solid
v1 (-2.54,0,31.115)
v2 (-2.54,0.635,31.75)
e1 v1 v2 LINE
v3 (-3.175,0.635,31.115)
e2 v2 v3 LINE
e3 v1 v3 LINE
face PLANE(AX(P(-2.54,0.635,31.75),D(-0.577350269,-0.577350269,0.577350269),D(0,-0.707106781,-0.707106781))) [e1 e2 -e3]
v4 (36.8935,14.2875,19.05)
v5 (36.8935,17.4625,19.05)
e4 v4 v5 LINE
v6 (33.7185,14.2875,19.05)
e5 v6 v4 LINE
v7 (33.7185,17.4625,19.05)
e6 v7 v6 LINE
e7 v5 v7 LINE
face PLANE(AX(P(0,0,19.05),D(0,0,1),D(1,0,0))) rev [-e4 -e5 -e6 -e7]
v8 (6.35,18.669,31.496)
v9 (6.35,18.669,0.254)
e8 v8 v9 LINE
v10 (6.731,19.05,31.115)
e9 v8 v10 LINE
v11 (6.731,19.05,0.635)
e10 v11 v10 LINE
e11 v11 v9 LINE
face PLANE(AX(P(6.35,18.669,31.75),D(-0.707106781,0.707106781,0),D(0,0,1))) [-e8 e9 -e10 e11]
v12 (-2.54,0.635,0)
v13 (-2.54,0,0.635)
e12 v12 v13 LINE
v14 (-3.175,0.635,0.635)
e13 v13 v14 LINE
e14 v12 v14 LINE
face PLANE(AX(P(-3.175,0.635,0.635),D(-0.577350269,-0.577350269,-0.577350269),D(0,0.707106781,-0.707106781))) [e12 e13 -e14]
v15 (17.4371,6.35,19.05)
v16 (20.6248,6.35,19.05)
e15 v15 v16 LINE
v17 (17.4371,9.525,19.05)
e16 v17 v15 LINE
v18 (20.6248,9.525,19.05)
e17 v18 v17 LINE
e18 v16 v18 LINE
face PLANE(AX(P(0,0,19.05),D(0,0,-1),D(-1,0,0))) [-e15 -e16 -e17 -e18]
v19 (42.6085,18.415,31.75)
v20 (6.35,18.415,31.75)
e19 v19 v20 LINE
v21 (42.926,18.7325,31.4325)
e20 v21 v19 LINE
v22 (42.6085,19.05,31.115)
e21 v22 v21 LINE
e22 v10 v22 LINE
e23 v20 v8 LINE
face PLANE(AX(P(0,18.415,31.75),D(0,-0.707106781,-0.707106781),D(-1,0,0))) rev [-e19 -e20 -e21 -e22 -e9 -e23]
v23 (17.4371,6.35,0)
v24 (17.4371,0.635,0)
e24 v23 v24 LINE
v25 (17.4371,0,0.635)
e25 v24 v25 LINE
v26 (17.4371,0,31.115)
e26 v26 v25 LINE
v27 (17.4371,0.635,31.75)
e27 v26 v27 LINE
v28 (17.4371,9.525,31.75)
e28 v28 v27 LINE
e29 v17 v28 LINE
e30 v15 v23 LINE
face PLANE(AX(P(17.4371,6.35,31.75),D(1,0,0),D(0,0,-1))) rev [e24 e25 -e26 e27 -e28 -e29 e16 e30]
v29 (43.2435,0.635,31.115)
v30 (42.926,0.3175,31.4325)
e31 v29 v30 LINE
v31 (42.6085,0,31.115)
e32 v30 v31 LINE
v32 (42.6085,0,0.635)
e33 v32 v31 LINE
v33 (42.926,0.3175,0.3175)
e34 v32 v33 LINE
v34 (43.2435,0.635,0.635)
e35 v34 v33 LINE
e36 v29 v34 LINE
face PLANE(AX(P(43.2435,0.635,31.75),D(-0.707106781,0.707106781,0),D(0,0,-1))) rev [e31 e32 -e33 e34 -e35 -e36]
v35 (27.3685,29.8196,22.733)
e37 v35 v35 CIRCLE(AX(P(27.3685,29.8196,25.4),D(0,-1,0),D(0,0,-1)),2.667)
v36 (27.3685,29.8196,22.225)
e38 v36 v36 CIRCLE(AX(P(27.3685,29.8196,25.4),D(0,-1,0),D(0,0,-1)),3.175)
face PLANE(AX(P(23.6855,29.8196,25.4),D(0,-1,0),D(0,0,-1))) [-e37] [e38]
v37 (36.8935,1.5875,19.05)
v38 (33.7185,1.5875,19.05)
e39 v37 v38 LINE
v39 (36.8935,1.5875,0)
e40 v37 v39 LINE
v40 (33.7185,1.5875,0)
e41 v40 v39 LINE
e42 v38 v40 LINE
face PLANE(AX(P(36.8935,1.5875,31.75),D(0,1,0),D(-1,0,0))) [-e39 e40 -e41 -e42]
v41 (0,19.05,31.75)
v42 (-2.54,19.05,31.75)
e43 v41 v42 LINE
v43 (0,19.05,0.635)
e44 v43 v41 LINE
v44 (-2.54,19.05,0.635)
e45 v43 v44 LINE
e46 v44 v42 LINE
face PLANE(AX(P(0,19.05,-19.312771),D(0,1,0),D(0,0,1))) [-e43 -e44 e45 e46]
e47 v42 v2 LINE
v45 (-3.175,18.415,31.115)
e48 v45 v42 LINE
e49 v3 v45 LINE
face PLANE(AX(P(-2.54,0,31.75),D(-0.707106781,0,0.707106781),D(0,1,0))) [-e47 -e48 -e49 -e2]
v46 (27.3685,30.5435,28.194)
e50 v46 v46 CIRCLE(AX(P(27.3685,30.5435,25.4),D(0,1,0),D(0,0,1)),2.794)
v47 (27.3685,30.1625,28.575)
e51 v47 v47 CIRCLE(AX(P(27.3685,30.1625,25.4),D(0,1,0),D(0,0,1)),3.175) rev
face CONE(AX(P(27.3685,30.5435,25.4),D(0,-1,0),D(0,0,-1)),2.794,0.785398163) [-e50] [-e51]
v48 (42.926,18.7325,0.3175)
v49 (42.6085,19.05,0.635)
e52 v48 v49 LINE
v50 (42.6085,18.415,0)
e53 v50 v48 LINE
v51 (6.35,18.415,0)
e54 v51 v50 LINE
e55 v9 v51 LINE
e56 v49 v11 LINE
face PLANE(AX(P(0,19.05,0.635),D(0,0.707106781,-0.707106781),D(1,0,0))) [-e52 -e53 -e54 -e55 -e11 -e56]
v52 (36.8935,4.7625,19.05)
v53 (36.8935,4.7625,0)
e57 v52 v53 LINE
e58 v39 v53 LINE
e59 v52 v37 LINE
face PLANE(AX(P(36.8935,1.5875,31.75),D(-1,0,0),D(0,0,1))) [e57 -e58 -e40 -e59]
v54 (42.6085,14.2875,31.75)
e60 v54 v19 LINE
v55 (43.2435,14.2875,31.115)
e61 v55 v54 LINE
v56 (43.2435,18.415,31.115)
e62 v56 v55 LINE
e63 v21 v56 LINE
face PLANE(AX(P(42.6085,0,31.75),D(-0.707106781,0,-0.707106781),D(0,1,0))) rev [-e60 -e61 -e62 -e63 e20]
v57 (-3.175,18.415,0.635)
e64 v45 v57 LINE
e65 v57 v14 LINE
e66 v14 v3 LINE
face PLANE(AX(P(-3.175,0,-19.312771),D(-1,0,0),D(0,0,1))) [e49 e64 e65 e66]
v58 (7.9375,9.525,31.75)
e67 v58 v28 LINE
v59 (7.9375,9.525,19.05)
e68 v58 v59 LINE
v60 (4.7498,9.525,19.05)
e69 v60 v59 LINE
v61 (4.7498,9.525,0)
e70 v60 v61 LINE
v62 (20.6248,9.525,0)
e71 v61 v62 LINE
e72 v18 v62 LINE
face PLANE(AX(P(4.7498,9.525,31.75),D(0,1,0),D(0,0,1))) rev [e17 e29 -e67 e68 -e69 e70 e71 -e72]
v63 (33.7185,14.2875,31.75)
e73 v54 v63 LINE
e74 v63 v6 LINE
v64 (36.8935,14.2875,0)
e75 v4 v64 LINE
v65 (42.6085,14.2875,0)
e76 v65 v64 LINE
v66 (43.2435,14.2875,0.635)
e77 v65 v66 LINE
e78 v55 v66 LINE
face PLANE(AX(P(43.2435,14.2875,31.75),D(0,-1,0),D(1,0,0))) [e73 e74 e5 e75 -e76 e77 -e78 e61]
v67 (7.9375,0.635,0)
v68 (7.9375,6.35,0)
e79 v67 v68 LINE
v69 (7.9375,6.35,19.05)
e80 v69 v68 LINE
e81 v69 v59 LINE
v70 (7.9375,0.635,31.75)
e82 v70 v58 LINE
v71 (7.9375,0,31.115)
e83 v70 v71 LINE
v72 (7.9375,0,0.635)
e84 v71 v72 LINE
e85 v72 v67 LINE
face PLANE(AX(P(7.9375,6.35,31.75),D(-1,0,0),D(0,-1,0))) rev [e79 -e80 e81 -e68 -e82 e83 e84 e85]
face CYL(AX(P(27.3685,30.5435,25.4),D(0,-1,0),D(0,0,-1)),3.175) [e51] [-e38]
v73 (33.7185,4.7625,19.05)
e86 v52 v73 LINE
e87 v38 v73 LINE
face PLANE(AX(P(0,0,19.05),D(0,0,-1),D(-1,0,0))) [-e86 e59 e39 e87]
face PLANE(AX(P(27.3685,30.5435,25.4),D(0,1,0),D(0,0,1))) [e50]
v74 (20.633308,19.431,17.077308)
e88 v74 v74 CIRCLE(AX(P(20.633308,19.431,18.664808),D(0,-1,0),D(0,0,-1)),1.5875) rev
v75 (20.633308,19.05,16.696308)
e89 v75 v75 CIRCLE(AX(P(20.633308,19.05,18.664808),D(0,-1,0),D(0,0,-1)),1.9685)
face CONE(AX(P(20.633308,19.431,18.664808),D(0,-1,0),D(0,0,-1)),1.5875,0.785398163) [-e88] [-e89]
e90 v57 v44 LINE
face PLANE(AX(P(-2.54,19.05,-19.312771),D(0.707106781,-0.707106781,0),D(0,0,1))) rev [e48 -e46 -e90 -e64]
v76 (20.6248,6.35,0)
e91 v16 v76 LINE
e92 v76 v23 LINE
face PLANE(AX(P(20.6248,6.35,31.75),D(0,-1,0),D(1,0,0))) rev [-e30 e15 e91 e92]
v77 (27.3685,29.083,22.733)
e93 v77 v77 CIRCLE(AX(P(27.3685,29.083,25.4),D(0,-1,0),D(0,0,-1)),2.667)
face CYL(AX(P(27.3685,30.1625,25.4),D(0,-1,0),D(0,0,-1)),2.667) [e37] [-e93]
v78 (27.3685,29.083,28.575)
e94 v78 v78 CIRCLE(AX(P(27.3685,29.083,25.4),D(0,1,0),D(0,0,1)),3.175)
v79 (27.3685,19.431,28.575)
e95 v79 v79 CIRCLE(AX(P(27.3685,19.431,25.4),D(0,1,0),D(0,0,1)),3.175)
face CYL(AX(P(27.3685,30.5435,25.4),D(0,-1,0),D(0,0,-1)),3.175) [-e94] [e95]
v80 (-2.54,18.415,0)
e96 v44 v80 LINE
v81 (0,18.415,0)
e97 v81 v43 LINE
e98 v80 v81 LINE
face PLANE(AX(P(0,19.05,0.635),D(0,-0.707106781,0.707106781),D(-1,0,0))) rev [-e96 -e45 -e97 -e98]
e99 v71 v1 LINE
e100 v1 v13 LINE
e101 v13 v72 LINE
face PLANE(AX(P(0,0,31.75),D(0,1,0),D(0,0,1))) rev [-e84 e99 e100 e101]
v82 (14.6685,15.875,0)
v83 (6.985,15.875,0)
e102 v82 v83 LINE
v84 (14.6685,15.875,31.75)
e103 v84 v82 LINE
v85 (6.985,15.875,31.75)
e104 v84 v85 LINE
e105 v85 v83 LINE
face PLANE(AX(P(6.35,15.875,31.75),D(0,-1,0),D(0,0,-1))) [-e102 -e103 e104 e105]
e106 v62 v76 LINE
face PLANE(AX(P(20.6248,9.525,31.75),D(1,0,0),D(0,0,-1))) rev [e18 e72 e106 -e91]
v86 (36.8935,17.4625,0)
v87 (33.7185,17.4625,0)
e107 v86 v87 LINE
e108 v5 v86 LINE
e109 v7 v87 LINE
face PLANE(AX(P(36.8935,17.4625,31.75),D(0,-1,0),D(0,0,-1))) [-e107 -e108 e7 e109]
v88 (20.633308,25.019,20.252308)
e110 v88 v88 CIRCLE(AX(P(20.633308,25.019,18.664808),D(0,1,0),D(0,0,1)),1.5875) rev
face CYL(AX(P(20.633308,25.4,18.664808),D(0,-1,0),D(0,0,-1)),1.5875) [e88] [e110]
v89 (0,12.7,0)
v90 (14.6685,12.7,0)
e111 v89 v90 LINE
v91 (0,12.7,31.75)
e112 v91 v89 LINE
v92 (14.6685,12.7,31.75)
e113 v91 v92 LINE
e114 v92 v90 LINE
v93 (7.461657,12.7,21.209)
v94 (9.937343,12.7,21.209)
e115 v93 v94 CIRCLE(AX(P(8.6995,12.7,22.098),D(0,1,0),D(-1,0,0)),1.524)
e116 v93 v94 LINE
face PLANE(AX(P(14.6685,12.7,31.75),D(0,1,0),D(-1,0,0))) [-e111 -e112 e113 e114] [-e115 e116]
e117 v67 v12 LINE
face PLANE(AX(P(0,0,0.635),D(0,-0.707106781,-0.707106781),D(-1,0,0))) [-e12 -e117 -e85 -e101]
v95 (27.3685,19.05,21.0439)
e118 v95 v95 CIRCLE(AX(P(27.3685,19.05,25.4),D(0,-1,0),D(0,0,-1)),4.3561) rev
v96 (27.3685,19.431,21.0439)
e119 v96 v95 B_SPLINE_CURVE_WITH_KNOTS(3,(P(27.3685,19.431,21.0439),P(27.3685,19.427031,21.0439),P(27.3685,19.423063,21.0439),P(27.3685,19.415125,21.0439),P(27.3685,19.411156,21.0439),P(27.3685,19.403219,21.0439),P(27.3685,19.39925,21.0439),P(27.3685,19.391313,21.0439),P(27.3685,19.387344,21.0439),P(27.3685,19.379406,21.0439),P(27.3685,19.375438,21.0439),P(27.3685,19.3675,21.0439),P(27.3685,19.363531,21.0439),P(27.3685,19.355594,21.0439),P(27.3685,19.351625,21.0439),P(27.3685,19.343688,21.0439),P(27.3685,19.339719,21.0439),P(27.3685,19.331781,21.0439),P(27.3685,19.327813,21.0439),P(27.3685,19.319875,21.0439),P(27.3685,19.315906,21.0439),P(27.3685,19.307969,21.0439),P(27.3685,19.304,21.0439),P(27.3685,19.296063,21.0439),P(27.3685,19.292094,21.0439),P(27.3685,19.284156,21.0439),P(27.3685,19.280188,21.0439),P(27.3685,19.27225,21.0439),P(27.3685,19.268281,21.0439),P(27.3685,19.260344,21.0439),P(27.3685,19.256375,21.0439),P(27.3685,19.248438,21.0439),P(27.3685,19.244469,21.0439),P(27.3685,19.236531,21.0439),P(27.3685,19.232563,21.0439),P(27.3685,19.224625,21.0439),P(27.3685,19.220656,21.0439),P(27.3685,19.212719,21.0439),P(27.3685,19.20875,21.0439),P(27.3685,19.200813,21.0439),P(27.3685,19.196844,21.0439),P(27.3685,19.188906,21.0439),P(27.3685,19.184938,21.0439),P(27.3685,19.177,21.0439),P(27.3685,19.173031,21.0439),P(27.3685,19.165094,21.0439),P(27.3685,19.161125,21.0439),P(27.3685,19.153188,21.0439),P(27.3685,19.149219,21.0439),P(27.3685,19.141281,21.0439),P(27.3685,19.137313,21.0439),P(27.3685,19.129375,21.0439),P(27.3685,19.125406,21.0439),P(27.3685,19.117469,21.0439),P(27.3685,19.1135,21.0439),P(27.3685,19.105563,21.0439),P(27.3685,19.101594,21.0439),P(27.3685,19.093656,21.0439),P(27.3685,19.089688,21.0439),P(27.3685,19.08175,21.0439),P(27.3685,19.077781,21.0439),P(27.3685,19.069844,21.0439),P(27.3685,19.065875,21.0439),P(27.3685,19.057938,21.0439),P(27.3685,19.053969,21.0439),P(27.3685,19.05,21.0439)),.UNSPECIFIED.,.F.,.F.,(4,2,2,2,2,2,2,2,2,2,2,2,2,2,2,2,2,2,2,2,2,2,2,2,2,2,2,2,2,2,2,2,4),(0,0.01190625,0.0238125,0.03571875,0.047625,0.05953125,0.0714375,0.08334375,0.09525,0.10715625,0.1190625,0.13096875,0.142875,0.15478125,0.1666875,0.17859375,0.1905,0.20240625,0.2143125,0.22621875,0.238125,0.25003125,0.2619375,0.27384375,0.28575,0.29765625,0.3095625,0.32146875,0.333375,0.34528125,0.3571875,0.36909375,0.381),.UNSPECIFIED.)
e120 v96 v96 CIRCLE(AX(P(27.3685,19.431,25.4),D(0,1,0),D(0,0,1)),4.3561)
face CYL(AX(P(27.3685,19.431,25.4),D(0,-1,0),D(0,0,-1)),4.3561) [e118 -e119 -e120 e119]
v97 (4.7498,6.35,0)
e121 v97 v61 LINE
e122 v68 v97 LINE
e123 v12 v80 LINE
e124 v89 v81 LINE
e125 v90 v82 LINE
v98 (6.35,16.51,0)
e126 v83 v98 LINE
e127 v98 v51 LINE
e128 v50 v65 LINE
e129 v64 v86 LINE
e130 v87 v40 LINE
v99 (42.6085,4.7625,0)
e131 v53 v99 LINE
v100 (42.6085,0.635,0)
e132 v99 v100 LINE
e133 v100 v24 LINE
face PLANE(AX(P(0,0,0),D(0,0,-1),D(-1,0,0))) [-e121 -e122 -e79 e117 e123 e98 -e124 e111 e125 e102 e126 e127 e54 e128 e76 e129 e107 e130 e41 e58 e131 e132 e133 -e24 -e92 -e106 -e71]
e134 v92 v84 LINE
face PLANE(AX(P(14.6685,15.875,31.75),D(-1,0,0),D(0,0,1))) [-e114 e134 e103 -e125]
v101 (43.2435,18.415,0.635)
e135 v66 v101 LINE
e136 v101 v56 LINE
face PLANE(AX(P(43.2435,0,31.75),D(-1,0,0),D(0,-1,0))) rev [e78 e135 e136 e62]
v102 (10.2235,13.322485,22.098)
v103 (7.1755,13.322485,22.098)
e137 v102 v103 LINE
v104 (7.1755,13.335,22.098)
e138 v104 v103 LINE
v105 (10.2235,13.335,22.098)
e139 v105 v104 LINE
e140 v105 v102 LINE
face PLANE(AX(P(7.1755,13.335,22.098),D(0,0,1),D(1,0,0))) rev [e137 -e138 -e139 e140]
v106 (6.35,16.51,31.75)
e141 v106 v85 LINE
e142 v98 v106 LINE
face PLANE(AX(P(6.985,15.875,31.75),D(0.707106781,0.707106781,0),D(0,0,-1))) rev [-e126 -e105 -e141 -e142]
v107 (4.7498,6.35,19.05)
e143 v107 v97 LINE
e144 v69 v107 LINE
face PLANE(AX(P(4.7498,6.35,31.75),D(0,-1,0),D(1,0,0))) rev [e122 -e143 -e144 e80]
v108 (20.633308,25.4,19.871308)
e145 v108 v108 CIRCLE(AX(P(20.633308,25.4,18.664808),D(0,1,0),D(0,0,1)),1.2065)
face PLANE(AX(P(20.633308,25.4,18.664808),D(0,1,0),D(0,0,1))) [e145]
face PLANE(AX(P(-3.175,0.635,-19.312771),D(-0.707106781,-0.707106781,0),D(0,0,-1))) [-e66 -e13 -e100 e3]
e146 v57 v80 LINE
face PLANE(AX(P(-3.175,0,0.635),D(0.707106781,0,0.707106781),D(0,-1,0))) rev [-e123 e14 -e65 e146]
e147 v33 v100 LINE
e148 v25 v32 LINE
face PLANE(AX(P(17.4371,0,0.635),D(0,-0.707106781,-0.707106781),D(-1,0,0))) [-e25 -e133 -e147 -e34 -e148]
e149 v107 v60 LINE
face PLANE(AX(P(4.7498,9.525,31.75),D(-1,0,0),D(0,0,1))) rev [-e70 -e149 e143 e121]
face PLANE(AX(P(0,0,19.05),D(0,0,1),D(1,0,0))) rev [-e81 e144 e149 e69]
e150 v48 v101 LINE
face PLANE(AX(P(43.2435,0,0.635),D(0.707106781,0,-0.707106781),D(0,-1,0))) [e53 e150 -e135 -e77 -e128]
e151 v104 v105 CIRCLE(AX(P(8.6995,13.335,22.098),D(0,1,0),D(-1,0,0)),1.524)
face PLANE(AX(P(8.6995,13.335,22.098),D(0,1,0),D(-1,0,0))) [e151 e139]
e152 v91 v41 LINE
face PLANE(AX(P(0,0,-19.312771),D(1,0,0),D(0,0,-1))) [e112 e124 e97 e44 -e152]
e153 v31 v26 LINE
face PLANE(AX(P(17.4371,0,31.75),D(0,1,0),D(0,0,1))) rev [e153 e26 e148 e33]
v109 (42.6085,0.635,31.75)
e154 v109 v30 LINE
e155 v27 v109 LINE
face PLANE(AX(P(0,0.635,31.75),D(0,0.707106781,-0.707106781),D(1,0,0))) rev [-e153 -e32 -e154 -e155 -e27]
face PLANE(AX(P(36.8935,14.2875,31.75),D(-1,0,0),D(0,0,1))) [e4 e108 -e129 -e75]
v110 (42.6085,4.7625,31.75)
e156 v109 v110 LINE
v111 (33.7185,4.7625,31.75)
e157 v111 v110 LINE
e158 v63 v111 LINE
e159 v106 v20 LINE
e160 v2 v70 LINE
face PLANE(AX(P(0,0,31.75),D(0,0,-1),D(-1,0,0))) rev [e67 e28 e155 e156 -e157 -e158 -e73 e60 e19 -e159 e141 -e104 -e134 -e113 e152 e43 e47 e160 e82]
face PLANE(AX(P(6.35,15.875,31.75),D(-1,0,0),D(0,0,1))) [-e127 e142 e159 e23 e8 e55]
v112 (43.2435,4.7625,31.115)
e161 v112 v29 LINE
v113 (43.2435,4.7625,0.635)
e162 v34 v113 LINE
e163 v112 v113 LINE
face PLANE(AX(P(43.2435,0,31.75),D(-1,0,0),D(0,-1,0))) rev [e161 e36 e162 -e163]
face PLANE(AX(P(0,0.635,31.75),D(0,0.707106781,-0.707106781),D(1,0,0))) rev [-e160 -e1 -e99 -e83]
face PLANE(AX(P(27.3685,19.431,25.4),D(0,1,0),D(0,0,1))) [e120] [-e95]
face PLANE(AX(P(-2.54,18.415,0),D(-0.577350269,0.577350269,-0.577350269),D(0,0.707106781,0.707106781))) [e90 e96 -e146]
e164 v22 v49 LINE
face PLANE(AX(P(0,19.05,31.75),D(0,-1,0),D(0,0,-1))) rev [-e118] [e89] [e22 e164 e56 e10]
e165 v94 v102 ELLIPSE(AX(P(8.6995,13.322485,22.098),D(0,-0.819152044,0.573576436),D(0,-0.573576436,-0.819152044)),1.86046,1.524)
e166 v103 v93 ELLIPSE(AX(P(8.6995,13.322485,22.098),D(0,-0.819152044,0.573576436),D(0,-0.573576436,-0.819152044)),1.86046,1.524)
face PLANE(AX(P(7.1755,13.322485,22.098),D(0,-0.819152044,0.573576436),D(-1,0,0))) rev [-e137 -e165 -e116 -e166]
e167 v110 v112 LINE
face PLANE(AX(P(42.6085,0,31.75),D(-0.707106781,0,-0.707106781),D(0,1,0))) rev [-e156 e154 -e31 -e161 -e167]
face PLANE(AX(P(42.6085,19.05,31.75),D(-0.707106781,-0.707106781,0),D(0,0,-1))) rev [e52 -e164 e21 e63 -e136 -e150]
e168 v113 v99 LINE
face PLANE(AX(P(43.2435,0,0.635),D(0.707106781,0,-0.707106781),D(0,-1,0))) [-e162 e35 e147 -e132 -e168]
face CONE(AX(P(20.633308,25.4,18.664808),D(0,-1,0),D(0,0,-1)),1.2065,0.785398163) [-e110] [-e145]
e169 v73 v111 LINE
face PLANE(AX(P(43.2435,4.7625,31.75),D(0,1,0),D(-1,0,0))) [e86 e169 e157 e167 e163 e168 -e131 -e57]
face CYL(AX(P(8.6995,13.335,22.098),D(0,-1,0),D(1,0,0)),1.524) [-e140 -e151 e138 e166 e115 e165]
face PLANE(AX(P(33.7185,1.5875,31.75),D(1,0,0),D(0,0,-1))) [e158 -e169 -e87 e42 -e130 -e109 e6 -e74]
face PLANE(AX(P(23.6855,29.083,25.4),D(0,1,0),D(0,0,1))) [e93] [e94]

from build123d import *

# Parameters (mm, degrees)
BOSS_EXTRUDE1_DEPTH  = 31.75
CUT_EXTRUDE2_DEPTH   = 57.92947648
CUT_EXTRUDE1_DEPTH   = 57.92947648
FILLET1_R            = 2.54
CHAMFER1_SIZE        = 0.635
SKETCH5_R            = 4.3561
BOSS_EXTRUDE3_DEPTH  = 0.381
SKETCH6_R            = 3.175
BOSS_EXTRUDE4_DEPTH  = 11.1125
CHAMFER7_SIZE        = 0.381
CUT_EXTRUDE3_DEPTH   = 57.92947648
SKETCH12_W           = 19.05
SKETCH12_H           = 19.05
BOSS_EXTRUDE9_DEPTH  = 31.75
CUT_EXTRUDE4_DEPTH   = 62.733039651
CHAMFER6_SIZE        = 0.635
SKETCH16_W           = 1.016
SKETCH16_H           = 0.7366
SKETCH7_R            = 1.5875
BOSS_EXTRUDE11_DEPTH = 6.35
CHAMFER9_SIZE        = 0.381
SKETCH18_W           = 3.81
SKETCH18_H           = 3.81
BOSS_EXTRUDE12_DEPTH = 12.7
BOSS_EXTRUDE13_DEPTH = 0.635
CHAMFER10_SIZE       = 0.889
CHAMFER10_SIZE2      = 0.622484501
SKETCH20_W           = 3.175
SKETCH20_H           = 19.05
BOSS_EXTRUDE14_DEPTH = 31.75


with BuildPart() as part:
    # Sketch1 → Boss-Extrude1 (new body)
    with BuildSketch(Plane.XY):
        Polygon((0, 0), (7.9375, 0), (7.9375, 6.35), (4.7498, 6.35), (4.7498, 9.525), (20.6248, 9.525), (20.6248, 6.35), (17.4371, 6.35), (17.4371, 0), (43.2435, 0), (43.2435, 19.05), (0, 19.05), align=None)
    extrude(amount=BOSS_EXTRUDE1_DEPTH)

    # Sketch3 → Cut-Extrude2 (cut, through all)
    with BuildSketch(Plane.XY):
        Polygon((6.35, 15.875), (14.6685, 15.875), (14.6685, 12.7), (0, 12.7), (0, 19.05), (6.35, 19.05), align=None)
    extrude(amount=CUT_EXTRUDE2_DEPTH, mode=Mode.SUBTRACT)

    # Sketch2 → Cut-Extrude1 (cut, through all)
    with BuildSketch(Plane.XY):
        Polygon((25.3873, 0), (43.2435, 9.525), (43.2435, 0), align=None)
    extrude(amount=CUT_EXTRUDE1_DEPTH, mode=Mode.SUBTRACT)

    # Fillet1
    fillet1_edges = [part.edges().sort_by_distance(p)[0] for p in [
        (43.2435, 19.05, 15.875),
        (25.3873, 0, 15.875),
        (43.2435, 9.525, 15.875),
    ]]
    fillet(fillet1_edges, radius=FILLET1_R)

    # Chamfer1
    chamfer1_edges = [part.edges().sort_by_distance(p)[0] for p in [
        (6.35, 15.875, 15.875),
    ]]
    chamfer(chamfer1_edges, length=CHAMFER1_SIZE)

    # Sketch5 → Boss-Extrude3 (add)
    with BuildSketch(Plane(origin=(0, 19.05, 0), x_dir=(1, 0, 0), z_dir=(0, 1, 0))):
        with Locations(Location((27.3685, -25.4, 0), (0, 0, 90))):
            Circle(SKETCH5_R)
    extrude(amount=BOSS_EXTRUDE3_DEPTH)

    # Sketch6 → Boss-Extrude4 (add)
    with BuildSketch(Plane(origin=(0, 19.431, 0), x_dir=(1, 0, 0), z_dir=(0, 1, 0))):
        with Locations(Location((27.3685, -25.4, 0), (0, 0, 270))):
            Circle(SKETCH6_R)
    extrude(amount=BOSS_EXTRUDE4_DEPTH)

    # Chamfer7
    chamfer7_edges = [part.edges().sort_by_distance(p)[0] for p in [
        (6.35, 19.05, 15.875),
        (27.3685, 30.5435, 22.225),
    ]]
    chamfer(chamfer7_edges, length=CHAMFER7_SIZE)

    # Sketch9 → Cut-Extrude3 (cut, through all)
    with BuildSketch(Plane(origin=(0, 19.05, 0), x_dir=(1, 0, 0), z_dir=(0, 1, 0))):
        Polygon((27.3685, 0), (43.2435, -19.05), (43.2435, 0), align=None)
    extrude(amount=-CUT_EXTRUDE3_DEPTH, mode=Mode.SUBTRACT)

    # Sketch12 → Boss-Extrude9 (add, through all)
    with BuildSketch(Plane.XY):
        with Locations((33.7185, 9.525)):
            Rectangle(SKETCH12_W, SKETCH12_H)
    extrude(amount=BOSS_EXTRUDE9_DEPTH)

    # Sketch13 → Cut-Extrude4 (cut, through all)
    with BuildSketch(Plane.XY):
        Polygon((43.2435, 14.2875), (36.8935, 14.2875), (36.8935, 17.4625), (33.7185, 17.4625), (33.7185, 1.5875), (36.8935, 1.5875), (36.8935, 4.7625), (43.2435, 4.7625), align=None)
    extrude(amount=CUT_EXTRUDE4_DEPTH, mode=Mode.SUBTRACT)

    # Chamfer6
    chamfer6_edges = [part.edges().sort_by_distance(p)[0] for p in [
        (43.2435, 19.05, 15.875),
        (43.2435, 0, 15.875),
        (43.2435, 2.38125, 0),
        (43.2435, 16.66875, 0),
    ]]
    chamfer(chamfer6_edges, length=CHAMFER6_SIZE)

    # Sketch16 → Cut-Revolve1 (revolve, cut)
    with BuildSketch(Plane.XY.offset(25.4), mode=Mode.PRIVATE) as cut_revolve1_sk:
        with Locations((24.1935, 29.4513)):
            Rectangle(SKETCH16_W, SKETCH16_H)
    revolve(cut_revolve1_sk.sketch.rotate(Axis((27.3685, 30.1625, 25.4), (0, 1, 0)), 270), axis=Axis((27.3685, 30.1625, 25.4), (0, 1, 0)), mode=Mode.SUBTRACT)

    # Sketch7 → Boss-Extrude11 (add)
    with BuildSketch(Plane(origin=(0, 19.05, 0), x_dir=(1, 0, 0), z_dir=(0, 1, 0))):
        with Locations(Location((20.633307909, -18.664807909, 0), (0, 0, 90))):
            Circle(SKETCH7_R)
    extrude(amount=BOSS_EXTRUDE11_DEPTH)

    # Chamfer9
    chamfer9_edges = [part.edges().sort_by_distance(p)[0] for p in [
        (20.633307909, 19.05, 20.252307909),
        (20.633307909, 25.4, 20.252307909),
    ]]
    chamfer(chamfer9_edges, length=CHAMFER9_SIZE)

    # Sketch18 → Boss-Extrude12 (add)
    with BuildSketch(Plane.XY.offset(31.75)):
        with Locations((6.0325, 8.001)):
            Rectangle(SKETCH18_W, SKETCH18_H)
        with Locations((19.3421, 8.001)):
            Rectangle(SKETCH18_W, SKETCH18_H)
        with Locations((35.3695, 2.8575)):
            Rectangle(SKETCH18_W, SKETCH18_H)
        with Locations((35.3695, 16.1925)):
            Rectangle(SKETCH18_W, SKETCH18_H)
    extrude(amount=-BOSS_EXTRUDE12_DEPTH)

    # Sketch19 → Boss-Extrude13 (add)
    with BuildSketch(Plane(origin=(0, 12.7, 0), x_dir=(1, 0, 0), z_dir=(0, 1, 0))):
        with BuildLine():
            Line((7.1755, -22.098), (10.2235, -22.098))
            ThreePointArc((10.2235, -22.098), (8.6995, -23.622), (7.1755, -22.098))
        make_face()
    extrude(amount=BOSS_EXTRUDE13_DEPTH)

    # Chamfer10
    chamfer10_edges = [part.edges().sort_by_distance(p)[0] for p in [
        (8.6995, 12.7, 22.098),
    ]]
    chamfer10_side = [part.faces().sort_by_distance(p)[0] for p in [
        (7.323470763, 12.7, 15.820759922),
    ]]
    chamfer(chamfer10_edges, length=CHAMFER10_SIZE, length2=CHAMFER10_SIZE2, reference=chamfer10_side[0])

    # Sketch20 → Boss-Extrude14 (add)
    with BuildSketch(Plane.XY.offset(31.75)):
        with Locations((-1.5875, 9.525)):
            Rectangle(SKETCH20_W, SKETCH20_H)
    extrude(amount=-BOSS_EXTRUDE14_DEPTH)

    # Chamfer11
    # the kernel refuses this chamfer: 0.635 mm, written as the material it takes off along each edge
    with BuildSketch(Plane(origin=(-2.751666667, 18.626666667, 0.423333333), x_dir=(-0.7071067811865465, -0.7071067811865485, 0), z_dir=(-0.5773502691896266, 0.577350269189625, -0.5773502691896257)), Plane(origin=(-2.751666667, 0.423333333, 0.423333333), x_dir=(-0.707106781186547, 0, 0.707106781186548), z_dir=(-0.5773502691896263, -0.5773502691896252, -0.5773502691896257))) as chamfer11_piece_1:
        Polygon((-0.449012806, 0.259237664), (0.449012806, 0.259237664), (0, -0.518475329), align=None)
    extrude(amount=0.806558326, mode=Mode.SUBTRACT)
    with BuildSketch(Plane(origin=(-2.751666667, 0.423333333, 31.326666667), x_dir=(-0.707106781186547, 0, -0.707106781186548), z_dir=(-0.5773502691896258, -0.5773502691896262, 0.5773502691896253))) as chamfer11_piece_2:
        Polygon((-0.449012806, -0.259237664), (0.449012806, -0.259237664), (0, 0.518475329), align=None)
    extrude(amount=0.806558326, mode=Mode.SUBTRACT)
    with BuildSketch(Plane(origin=(-3.175, 19.05, 33.383018697), x_dir=(0.9996219169112968, 0.027495876610584568, 0), z_dir=(0, 0, -1)), Plane(origin=(-3.175, 0, 33.383018697), x_dir=(-0.027495876610586605, 0.9996219169112968, 0), z_dir=(0, 0, -1))) as chamfer11_piece_3:
        with BuildLine():
            Line((0.653207479, 0), (-0.035907443, 0.652219799))
            Line((-0.035907443, 0.652219799), (-0.048602642, 0.651870601))
            ThreePointArc((-0.048602642, 0.651870601), (-0.021672059, 0.326007622), (-0.012695198, -0.000349198))
            Line((-0.012695198, -0.000349198), (0.000349198, -0.012695198))
            ThreePointArc((0.000349198, -0.012695198), (0.326706017, -0.003718338), (0.653556677, -0.012695198))
            Line((0.653556677, -0.012695198), (0.653207479, 0))
        make_face()
    extrude(amount=35.016037395, mode=Mode.SUBTRACT)
    with BuildSketch(Plane(origin=(5.097981303, 19.05, 0), x_dir=(0, 0.027495876610584568, 0.9996219169112968), z_dir=(1, 0, 0))) as chamfer11_piece_4:
        with BuildLine():
            Line((0.653207479, 0), (-0.035907443, 0.652219799))
            Line((-0.035907443, 0.652219799), (-0.048602642, 0.651870601))
            ThreePointArc((-0.048602642, 0.651870601), (-0.021672059, 0.326007622), (-0.012695198, -0.000349198))
            Line((-0.012695198, -0.000349198), (0.000349198, -0.012695198))
            ThreePointArc((0.000349198, -0.012695198), (0.326706017, -0.003718338), (0.653556677, -0.012695198))
            Line((0.653556677, -0.012695198), (0.653207479, 0))
        make_face()
    extrude(amount=39.143537395, mode=Mode.SUBTRACT)
    with BuildSketch(Plane(origin=(44.241518697, 0, 0), x_dir=(0, -0.027495876610586365, 0.9996219169112968), z_dir=(-1, 0, 0))) as chamfer11_piece_5:
        with BuildLine():
            Line((0.653207479, 0), (-0.035907443, 0.652219799))
            Line((-0.035907443, 0.652219799), (-0.048602642, 0.651870601))
            ThreePointArc((-0.048602642, 0.651870601), (-0.021672059, 0.326007622), (-0.012695198, -0.000349198))
            Line((-0.012695198, -0.000349198), (0.000349198, -0.012695198))
            ThreePointArc((0.000349198, -0.012695198), (0.326706017, -0.003718338), (0.653556677, -0.012695198))
            Line((0.653556677, -0.012695198), (0.653207479, 0))
        make_face()
    extrude(amount=28.437437395, mode=Mode.SUBTRACT)
    with BuildSketch(Plane(origin=(44.241518697, 0, 31.75), x_dir=(0, -0.02749587661058632, -0.9996219169112968), z_dir=(-1, 0, 0))) as chamfer11_piece_6:
        with BuildLine():
            Line((0.653207479, 0), (-0.035907443, -0.652219799))
            Line((-0.035907443, -0.652219799), (-0.048602642, -0.651870601))
            ThreePointArc((-0.048602642, -0.651870601), (-0.021672059, -0.326007622), (-0.012695198, 0.000349198))
            Line((-0.012695198, 0.000349198), (0.000349198, 0.012695198))
            ThreePointArc((0.000349198, 0.012695198), (0.326706017, 0.003718338), (0.653556677, 0.012695198))
            Line((0.653556677, 0.012695198), (0.653207479, 0))
        make_face()
    extrude(amount=28.437437395, mode=Mode.SUBTRACT)
    with BuildSketch(Plane(origin=(5.097981303, 19.05, 31.75), x_dir=(0, 0.02749587661058455, -0.9996219169112968), z_dir=(1, 0, 0))) as chamfer11_piece_7:
        with BuildLine():
            Line((0.653207479, 0), (-0.035907443, -0.652219799))
            Line((-0.035907443, -0.652219799), (-0.048602642, -0.651870601))
            ThreePointArc((-0.048602642, -0.651870601), (-0.021672059, -0.326007622), (-0.012695198, 0.000349198))
            Line((-0.012695198, 0.000349198), (0.000349198, 0.012695198))
            ThreePointArc((0.000349198, 0.012695198), (0.326706017, 0.003718338), (0.653556677, 0.012695198))
            Line((0.653556677, 0.012695198), (0.653207479, 0))
        make_face()
    extrude(amount=39.143537395, mode=Mode.SUBTRACT)
    with BuildSketch(Plane(origin=(-4.808018697, 19.05, 0), x_dir=(0, 0.0274958766105845, 0.9996219169112968), z_dir=(1, 0, 0))) as chamfer11_piece_8:
        with BuildLine():
            Line((0.653207479, 0), (-0.035907443, 0.652219799))
            Line((-0.035907443, 0.652219799), (-0.048602642, 0.651870601))
            ThreePointArc((-0.048602642, 0.651870601), (-0.021672059, 0.326007622), (-0.012695198, -0.000349198))
            Line((-0.012695198, -0.000349198), (0.000349198, -0.012695198))
            ThreePointArc((0.000349198, -0.012695198), (0.326706017, -0.003718338), (0.653556677, -0.012695198))
            Line((0.653556677, -0.012695198), (0.653207479, 0))
        make_face()
    extrude(amount=6.441037395, mode=Mode.SUBTRACT)
    with BuildSketch(Plane(origin=(9.570518697, 0, 0), x_dir=(0, -0.027495876610586365, 0.9996219169112968), z_dir=(-1, 0, 0)), Plane(origin=(-4.808018697, 0, 31.75), x_dir=(0, -0.02749587661058632, -0.9996219169112968), z_dir=(1, 0, 0))) as chamfer11_piece_9:
        with BuildLine():
            Line((0.653207479, 0), (-0.035907443, 0.652219799))
            Line((-0.035907443, 0.652219799), (-0.048602642, 0.651870601))
            ThreePointArc((-0.048602642, 0.651870601), (-0.021672059, 0.326007622), (-0.012695198, -0.000349198))
            Line((-0.012695198, -0.000349198), (0.000349198, -0.012695198))
            ThreePointArc((0.000349198, -0.012695198), (0.326706017, -0.003718338), (0.653556677, -0.012695198))
            Line((0.653556677, -0.012695198), (0.653207479, 0))
        make_face()
    extrude(amount=14.378537395, mode=Mode.SUBTRACT)
    with BuildSketch(Plane(origin=(43.2435, -0.998018697, 31.75), x_dir=(0.027495876610589984, 0, -0.9996219169112966), z_dir=(0, 1, 0)), Plane(origin=(43.2435, 12.654481303, 31.75), x_dir=(0.027495876610589984, 0, -0.9996219169112966), z_dir=(0, 1, 0))) as chamfer11_piece_10:
        with BuildLine():
            Line((0.653207479, 0), (-0.035907443, 0.652219799))
            Line((-0.035907443, 0.652219799), (-0.048602642, 0.651870601))
            ThreePointArc((-0.048602642, 0.651870601), (-0.021672059, 0.326007622), (-0.012695198, -0.000349198))
            Line((-0.012695198, -0.000349198), (0.000349198, -0.012695198))
            ThreePointArc((0.000349198, -0.012695198), (0.326706017, -0.003718338), (0.653556677, -0.012695198))
            Line((0.653556677, -0.012695198), (0.653207479, 0))
        make_face()
    extrude(amount=7.393537395, mode=Mode.SUBTRACT)
    with BuildSketch(Plane(origin=(-3.175, -1.633018697, 0), x_dir=(-0.02749587661058654, 0, 0.9996219169112968), z_dir=(0, 1, 0))) as chamfer11_piece_11:
        with BuildLine():
            Line((0.653207479, 0), (-0.035907443, 0.652219799))
            Line((-0.035907443, 0.652219799), (-0.048602642, 0.651870601))
            ThreePointArc((-0.048602642, 0.651870601), (-0.021672059, 0.326007622), (-0.012695198, -0.000349198))
            Line((-0.012695198, -0.000349198), (0.000349198, -0.012695198))
            ThreePointArc((0.000349198, -0.012695198), (0.326706017, -0.003718338), (0.653556677, -0.012695198))
            Line((0.653556677, -0.012695198), (0.653207479, 0))
        make_face()
    extrude(amount=22.316037395, mode=Mode.SUBTRACT)
    with BuildSketch(Plane(origin=(-3.175, -1.633018697, 31.75), x_dir=(-0.02749587661058659, 0, -0.9996219169112968), z_dir=(0, 1, 0))) as chamfer11_piece_12:
        with BuildLine():
            Line((0.653207479, 0), (-0.035907443, -0.652219799))
            Line((-0.035907443, -0.652219799), (-0.048602642, -0.651870601))
            ThreePointArc((-0.048602642, -0.651870601), (-0.021672059, -0.326007622), (-0.012695198, 0.000349198))
            Line((-0.012695198, 0.000349198), (0.000349198, 0.012695198))
            ThreePointArc((0.000349198, 0.012695198), (0.326706017, 0.003718338), (0.653556677, 0.012695198))
            Line((0.653556677, 0.012695198), (0.653207479, 0))
        make_face()
    extrude(amount=22.316037395, mode=Mode.SUBTRACT)


solid = part.part
